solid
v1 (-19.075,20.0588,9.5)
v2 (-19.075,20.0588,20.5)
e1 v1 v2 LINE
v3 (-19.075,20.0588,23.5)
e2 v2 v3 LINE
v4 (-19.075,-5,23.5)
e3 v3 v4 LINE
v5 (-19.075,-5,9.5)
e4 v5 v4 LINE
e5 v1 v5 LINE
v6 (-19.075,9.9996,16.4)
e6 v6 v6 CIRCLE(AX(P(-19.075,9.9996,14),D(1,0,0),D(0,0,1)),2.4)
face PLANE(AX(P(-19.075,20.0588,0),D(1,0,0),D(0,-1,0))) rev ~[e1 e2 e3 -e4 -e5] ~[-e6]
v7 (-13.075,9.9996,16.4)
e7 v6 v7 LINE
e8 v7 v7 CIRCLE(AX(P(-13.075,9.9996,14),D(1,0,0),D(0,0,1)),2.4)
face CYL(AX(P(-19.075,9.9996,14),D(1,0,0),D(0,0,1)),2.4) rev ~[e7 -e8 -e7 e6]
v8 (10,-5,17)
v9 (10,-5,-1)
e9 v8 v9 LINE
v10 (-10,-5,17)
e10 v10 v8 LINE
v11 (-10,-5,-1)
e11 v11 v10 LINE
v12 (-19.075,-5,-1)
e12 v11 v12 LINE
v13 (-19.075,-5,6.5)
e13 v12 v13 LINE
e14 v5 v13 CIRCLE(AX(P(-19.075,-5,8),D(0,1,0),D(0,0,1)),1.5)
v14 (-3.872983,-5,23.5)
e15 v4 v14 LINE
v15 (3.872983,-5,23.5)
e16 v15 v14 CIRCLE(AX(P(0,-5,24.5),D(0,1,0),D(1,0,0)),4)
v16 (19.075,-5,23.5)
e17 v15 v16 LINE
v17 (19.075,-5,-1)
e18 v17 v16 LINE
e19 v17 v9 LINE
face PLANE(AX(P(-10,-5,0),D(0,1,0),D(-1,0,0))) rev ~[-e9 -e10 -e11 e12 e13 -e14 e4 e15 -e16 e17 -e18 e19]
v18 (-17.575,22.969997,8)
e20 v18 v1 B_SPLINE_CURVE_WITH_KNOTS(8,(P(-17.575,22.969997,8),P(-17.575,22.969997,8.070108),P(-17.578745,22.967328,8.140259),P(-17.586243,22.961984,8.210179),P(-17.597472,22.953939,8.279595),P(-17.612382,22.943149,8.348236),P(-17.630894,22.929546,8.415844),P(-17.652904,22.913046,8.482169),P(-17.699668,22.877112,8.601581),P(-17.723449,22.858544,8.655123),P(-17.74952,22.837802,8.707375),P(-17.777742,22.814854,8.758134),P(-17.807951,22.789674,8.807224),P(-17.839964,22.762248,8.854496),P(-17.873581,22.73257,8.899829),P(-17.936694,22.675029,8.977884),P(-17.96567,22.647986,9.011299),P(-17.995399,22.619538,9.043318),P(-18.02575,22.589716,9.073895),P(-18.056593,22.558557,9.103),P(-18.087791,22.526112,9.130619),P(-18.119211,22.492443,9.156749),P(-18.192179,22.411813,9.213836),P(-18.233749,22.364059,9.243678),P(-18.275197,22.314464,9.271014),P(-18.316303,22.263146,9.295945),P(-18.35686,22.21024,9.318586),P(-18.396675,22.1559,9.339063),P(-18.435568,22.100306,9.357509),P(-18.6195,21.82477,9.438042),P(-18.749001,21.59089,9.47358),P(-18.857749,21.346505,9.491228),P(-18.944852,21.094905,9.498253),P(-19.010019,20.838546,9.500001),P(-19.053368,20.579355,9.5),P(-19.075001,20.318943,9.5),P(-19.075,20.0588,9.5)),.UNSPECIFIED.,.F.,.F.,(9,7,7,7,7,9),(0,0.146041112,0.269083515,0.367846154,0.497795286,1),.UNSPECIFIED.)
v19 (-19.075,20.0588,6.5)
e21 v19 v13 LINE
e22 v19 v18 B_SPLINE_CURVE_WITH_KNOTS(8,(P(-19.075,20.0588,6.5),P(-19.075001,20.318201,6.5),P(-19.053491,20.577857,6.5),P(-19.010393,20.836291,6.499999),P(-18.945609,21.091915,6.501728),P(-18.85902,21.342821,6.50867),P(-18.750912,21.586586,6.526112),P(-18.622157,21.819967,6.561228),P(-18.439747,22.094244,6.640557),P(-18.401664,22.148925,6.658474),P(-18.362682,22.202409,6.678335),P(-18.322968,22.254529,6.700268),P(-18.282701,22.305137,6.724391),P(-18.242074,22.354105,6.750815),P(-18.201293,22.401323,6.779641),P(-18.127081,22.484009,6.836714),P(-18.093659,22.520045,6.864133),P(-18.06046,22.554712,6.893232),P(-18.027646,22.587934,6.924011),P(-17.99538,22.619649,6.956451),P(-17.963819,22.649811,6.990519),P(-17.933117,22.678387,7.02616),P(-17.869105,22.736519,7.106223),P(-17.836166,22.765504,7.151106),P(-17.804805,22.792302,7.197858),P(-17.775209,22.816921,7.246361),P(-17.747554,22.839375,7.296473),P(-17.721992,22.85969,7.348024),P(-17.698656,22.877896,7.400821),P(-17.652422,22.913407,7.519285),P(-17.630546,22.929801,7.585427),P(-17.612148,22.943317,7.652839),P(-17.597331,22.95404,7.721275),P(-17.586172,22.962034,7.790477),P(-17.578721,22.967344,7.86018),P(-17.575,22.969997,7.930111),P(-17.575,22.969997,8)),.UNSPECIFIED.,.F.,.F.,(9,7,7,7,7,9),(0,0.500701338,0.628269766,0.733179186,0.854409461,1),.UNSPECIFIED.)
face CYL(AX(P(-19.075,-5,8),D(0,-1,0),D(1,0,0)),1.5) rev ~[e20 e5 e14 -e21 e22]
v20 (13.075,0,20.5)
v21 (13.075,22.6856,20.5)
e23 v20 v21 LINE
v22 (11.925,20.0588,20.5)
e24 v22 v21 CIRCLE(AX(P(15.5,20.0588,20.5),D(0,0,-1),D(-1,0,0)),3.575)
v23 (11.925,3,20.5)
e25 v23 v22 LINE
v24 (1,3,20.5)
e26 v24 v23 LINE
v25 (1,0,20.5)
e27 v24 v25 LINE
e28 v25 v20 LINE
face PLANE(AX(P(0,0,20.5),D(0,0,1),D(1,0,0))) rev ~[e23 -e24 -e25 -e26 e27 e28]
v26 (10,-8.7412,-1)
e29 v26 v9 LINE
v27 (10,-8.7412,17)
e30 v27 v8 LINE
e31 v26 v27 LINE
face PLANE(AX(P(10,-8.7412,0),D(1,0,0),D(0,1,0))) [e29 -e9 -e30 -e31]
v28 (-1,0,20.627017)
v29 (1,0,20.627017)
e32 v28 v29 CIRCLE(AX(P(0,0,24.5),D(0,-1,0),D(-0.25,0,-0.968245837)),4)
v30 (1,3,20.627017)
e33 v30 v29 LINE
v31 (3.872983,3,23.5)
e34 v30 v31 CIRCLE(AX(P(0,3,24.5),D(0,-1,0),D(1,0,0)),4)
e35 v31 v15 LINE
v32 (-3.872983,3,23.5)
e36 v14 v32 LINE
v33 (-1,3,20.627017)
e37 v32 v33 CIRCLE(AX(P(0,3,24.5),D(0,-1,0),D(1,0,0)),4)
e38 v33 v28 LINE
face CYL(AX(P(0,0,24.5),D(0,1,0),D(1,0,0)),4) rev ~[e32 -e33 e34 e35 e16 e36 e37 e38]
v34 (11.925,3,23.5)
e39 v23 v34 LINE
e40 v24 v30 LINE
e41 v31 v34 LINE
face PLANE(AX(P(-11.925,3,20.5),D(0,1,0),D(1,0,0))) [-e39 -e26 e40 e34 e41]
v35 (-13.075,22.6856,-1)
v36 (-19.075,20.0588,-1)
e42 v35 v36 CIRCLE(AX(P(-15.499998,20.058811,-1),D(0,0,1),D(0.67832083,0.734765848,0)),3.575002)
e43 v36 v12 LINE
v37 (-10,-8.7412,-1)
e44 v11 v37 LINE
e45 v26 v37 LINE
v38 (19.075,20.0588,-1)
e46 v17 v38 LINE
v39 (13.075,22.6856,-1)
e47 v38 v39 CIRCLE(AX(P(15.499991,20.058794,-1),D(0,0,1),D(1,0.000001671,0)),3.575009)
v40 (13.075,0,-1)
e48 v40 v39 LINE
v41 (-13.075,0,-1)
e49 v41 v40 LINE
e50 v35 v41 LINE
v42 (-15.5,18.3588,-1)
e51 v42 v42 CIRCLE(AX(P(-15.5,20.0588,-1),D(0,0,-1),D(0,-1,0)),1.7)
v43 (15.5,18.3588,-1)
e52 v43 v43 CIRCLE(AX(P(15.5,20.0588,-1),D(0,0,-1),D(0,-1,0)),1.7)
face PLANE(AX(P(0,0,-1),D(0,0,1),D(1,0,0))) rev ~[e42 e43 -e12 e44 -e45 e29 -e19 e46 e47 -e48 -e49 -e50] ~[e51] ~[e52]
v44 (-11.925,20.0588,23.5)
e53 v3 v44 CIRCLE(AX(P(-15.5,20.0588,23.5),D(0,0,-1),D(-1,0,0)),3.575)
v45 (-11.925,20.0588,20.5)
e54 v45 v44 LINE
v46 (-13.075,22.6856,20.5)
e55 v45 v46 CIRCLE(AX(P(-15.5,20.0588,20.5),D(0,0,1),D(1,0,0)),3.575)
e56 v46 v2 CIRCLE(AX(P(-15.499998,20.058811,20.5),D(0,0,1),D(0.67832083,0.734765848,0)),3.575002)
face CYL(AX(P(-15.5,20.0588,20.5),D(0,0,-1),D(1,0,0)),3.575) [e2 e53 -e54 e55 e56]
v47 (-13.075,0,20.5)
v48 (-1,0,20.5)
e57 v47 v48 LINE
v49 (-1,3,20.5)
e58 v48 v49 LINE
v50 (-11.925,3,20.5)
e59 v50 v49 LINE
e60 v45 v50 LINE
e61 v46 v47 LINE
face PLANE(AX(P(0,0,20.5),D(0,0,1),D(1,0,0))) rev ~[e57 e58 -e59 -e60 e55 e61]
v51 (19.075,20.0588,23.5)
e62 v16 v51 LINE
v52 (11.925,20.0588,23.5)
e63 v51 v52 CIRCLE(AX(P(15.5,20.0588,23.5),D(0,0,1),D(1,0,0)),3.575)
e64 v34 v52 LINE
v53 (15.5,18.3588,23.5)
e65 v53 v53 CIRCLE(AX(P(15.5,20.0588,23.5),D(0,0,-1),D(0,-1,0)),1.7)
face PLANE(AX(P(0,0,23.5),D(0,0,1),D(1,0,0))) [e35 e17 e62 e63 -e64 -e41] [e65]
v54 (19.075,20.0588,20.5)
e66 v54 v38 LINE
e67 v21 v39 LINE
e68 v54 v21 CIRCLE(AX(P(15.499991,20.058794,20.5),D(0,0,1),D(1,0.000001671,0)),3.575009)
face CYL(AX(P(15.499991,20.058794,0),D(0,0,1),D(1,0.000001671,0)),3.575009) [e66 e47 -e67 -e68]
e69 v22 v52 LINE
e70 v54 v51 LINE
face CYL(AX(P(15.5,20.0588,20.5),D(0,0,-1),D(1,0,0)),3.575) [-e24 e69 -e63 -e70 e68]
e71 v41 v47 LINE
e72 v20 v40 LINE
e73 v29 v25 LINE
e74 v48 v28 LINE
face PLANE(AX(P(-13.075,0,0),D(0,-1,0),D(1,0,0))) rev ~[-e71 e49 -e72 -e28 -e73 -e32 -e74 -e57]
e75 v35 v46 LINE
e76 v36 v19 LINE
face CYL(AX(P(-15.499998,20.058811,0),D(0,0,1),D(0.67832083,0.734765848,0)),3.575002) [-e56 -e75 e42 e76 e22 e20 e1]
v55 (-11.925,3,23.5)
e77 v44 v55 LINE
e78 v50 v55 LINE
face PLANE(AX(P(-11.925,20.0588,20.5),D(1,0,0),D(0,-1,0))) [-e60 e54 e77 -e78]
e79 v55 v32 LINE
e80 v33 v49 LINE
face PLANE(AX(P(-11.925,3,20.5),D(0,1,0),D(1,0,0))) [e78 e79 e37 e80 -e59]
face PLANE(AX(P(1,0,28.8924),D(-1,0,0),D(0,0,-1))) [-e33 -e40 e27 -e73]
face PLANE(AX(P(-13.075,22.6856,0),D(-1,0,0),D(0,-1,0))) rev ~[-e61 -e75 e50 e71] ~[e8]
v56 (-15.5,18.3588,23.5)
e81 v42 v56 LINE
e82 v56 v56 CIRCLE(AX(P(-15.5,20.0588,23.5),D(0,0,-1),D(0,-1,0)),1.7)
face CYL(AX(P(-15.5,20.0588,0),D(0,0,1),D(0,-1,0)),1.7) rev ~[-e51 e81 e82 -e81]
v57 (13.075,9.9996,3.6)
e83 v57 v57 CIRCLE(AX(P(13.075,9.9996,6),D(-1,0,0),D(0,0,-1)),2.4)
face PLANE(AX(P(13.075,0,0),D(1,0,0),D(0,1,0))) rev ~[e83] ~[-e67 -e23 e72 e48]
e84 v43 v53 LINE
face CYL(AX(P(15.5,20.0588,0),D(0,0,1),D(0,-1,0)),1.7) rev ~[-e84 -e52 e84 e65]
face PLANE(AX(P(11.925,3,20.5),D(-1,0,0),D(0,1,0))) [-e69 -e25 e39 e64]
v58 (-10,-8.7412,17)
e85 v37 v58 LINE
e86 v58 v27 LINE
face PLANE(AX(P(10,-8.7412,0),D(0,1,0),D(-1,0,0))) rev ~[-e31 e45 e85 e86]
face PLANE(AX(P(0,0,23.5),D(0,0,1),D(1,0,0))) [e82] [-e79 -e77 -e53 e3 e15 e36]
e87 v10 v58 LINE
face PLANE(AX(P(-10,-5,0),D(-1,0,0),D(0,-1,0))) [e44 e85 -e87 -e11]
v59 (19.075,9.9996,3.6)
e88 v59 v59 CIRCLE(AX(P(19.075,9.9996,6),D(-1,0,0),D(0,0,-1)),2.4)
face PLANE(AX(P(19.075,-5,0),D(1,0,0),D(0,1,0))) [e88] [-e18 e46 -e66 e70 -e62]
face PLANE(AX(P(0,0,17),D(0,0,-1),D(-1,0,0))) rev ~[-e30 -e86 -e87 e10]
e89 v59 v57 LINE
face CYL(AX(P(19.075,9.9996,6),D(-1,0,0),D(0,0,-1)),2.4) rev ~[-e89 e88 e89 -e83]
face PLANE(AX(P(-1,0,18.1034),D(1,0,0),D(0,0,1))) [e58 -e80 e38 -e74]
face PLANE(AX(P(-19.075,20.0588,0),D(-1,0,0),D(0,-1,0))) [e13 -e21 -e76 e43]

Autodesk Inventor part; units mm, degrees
ref_plane "YZ Plane" through (0, 0, 0) normal (1, 0, 0) x (0, 1, 0)
ref_plane "XZ Plane" through (0, 0, 0) normal (0, 1, 0) x (-1, 0, 0)
ref_plane "XY Plane" through (0, 0, 0) normal (0, 0, 1) x (1, 0, 0)
sketch "Sketch1" plane through (0, 0, 0) normal (0, 0, 1) x (1, 0, 0)
  line L0 (-13.075, 0) -> (13.075, 0)
  line L1 (13.075, 0) -> (13.075, 22.6856)
  line L2 (-13.075, 22.6856) -> (-13.075, 0)
  line L3 (-19.075, -5) -> (11.925, -5)
  line L4 (19.075, -5) -> (19.075, 20.0588)
  line L5 (-19.075, 20.0588) -> (-19.075, -5)
  circle A0 centre (-15.5, 20.0588) radius 1.5
  circle A1 centre (15.5, 20.0588) radius 1.5
  arc A2 (19.075, 20.0588) -> (13.075, 22.6856) centre (15.5, 20.0588) ccw
  arc A3 (-13.075, 22.6856) -> (-19.075, 20.0588) centre (-15.5, 20.0588) ccw
  line L6 (11.925, -5) -> (19.075, -5)
  point P0 (0, 0)
  dimension "d8" = 5
  dimension "d10" = 6
  dimension "d12" = 31
  dimension "d14" = 3
  dimension "d15" = 3
  dimension "d17" = 26.15
  dimension "d18" = 13.075
  dimension "d19" = 15.5
extrude "Extrusion1" add sketch "Sketch1" along normal blind 20.5 contours L0 L1 A2 L4 L6 L3 L5 A3 L2 | A0 | A1
sketch "Sketch4" plane through (0, 0, 20.5) normal (0, 0, 1) x (1, 0, 0)
  arc A0 (-11.925, 20.0588) -> (-19.075, 20.0588) centre (-15.5, 20.0588) ccw
  arc A1 (19.075, 20.0588) -> (11.925, 20.0588) centre (15.5, 20.0588) ccw
  arc A2 (19.075, 20.0588) -> (13.075, 22.6856) centre (15.5, 20.0588) ccw projected
  arc A3 (-13.075, 22.6856) -> (-19.075, 20.0588) centre (-15.5, 20.0588) ccw projected
  line L0 (-19.075, -5) -> (19.075, -5) projected
  line L1 (19.075, -5) -> (19.075, 20.0588) projected
  arc A4 (19.075, 20.0588) -> (13.075, 22.6856) centre (15.5, 20.0588) ccw projected
  line L2 (13.075, 22.6856) -> (13.075, 0) projected
  line L3 (13.075, 0) -> (-13.075, 0) projected
  line L4 (-13.075, 0) -> (-13.075, 22.6856) projected
  arc A5 (-13.075, 22.6856) -> (-19.075, 20.0588) centre (-15.5, 20.0588) ccw projected
  line L5 (-19.075, 20.0588) -> (-19.075, -5) projected
  line L6 (-11.925, 20.0588) -> (-11.925, 3)
  line L7 (-11.925, 3) -> (11.925, 3)
  line L8 (11.925, 3) -> (11.925, 20.0588)
  point P0 (0, 0)
  point P1 (13.075, 22.6856)
  point P2 (13.075, 22.6856)
  dimension "d37" = 3
extrude "Extrusion3" add sketch "Sketch4" along normal blind 3
sketch "Sketch5" plane through (0, 0, 23.5) normal (0, 0, 1) x (1, 0, 0)
  arc A0 (-13.075, 22.6856) -> (-19.075, 20.0588) centre (-15.5, 20.0588) ccw projected
  arc A1 (19.075, 20.0588) -> (13.075, 22.6856) centre (15.5, 20.0588) ccw projected
  point P0 (0, 0)
hole "Hole2" at (-15.5, 20.0588, 23.5) at (15.5, 20.0588, 23.5) direction (0, 0, -1) diameter 3.4 end through all clearance for "Socket Head Cap Screw" size "M3" standard "Ansi Metric M Profile"
sketch "Sketch8" plane through (-13.075, 0, 0) normal (0, 1, 0) x (1, 0, 0)
  circle A0 centre (13.075, -24.5) radius 4
  line L0 (25, -23.5) -> (1.15, -23.5) projected
  point P0 (13.075, 0)
  dimension "d62" = 8
  dimension "d63" = 1
extrude "Extrusion5" cut sketch "Sketch8" against normal through all both and the other way through all
sketch "Sketch9" plane through (-13.075, 0, 0) normal (0, 1, 0) x (1, 0, 0)
  line L0 (12.075, -28.8924) -> (14.075, -28.8924)
  line L1 (14.075, -28.8924) -> (14.075, -18.1034)
  line L2 (14.075, -18.1034) -> (12.075, -18.1034)
  line L3 (12.075, -18.1034) -> (12.075, -28.8924)
  line L4 (12.075, -28.8924) -> (14.075, -18.1034) construction
  line L5 (14.075, -28.8924) -> (12.075, -18.1034) construction
  point P0 (13.075, 0)
  point P1 (13.075, -23.4979)
  dimension "d66" = 2
extrude "Extrusion6" cut sketch "Sketch9" along normal blind 10
sketch "Sketch10" plane through (19.075, -5, 0) normal (1, 0, 0) x (0, 0, -1)
  circle A0 centre (-6, 14.9996) radius 2
  line L0 (0, 0) -> (-23.5, 0) projected
  line L1 (0, 0) -> (0, 25.0588) projected
  line L2 (0, 27.6856) -> (-20.5, 27.6856) projected
  point P0 (0, 5)
  dimension "d70" = 6
  dimension "d71" = 4
  dimension "d88" = 12.686
hole "Hole4" at (19.075, 9.9996, 6) direction (-1, 0, 0) diameter 4.8 depth 6 clearance for "Socket Head Cap Screw" size "M4" standard "Ansi Metric M Profile"
sketch "Sketch11" plane through (-19.075, -5, 0) normal (-1, 0, 0) x (0, 0, 1)
  circle A0 centre (14, 14.9996) radius 3.2686
  line L0 (0, 0) -> (23.5, 0) projected
  circle A1 centre (6, 14.9996) radius 2.4 projected
  line L1 (0, 27.6856) -> (20.5, 27.6856) projected
  point P0 (0, 5)
  point P1 (10.9595, 8.3093)
  dimension "d80" = 8
  dimension "d89" = 12.686
hole "Hole5" at (-19.075, 9.9996, 14) direction (1, 0, 0) diameter 4.8 depth 6 clearance for "Socket Head Cap Screw" size "M4" standard "Ansi Metric M Profile"
sketch "Sketch12" plane through (-19.075, -5, 0) normal (0, -1, 0) x (1, 0, 0)
  line L0 (38.15, 0) -> (38.15, 23.5) projected
  circle A0 centre (0, 8) radius 1.5
  line L1 (0, 0) -> (0, 23.5) projected
  line L2 (0, 0) -> (38.15, 0) projected
  point P0 (19.075, 0)
  dimension "d93" = 3
  dimension "d94" = 8
extrude "Extrusion7" cut sketch "Sketch12" against normal through all
sketch "Sketch13" plane through (0, 0, 0) normal (0, 0, -1) x (-1, 0, 0)
  circle A0 centre (15.5, 20.0588) radius 1.7 projected
  circle A1 centre (-15.5, 20.0588) radius 1.7 projected
  line L0 (19.075, 20.0588) -> (19.075, -5) projected
  arc A2 (19.075, 20.0588) -> (13.075, 22.6856) centre (15.5, 20.0588) ccw projected
  line L1 (13.075, 0) -> (13.075, 22.6856) projected
  line L2 (-13.075, 0) -> (13.075, 0) projected
  line L3 (-13.075, 22.6856) -> (-13.075, 0) projected
  arc A3 (-13.075, 22.6856) -> (-19.075, 20.0588) centre (-15.5, 20.0588) ccw projected
  line L4 (-19.075, -5) -> (-19.075, 20.0588) projected
  line L5 (19.075, -5) -> (-19.075, -5) projected
  line L6 (-4.8329, -8.7412) -> (5.1671, -8.7412) projected
  line L7 (-10, -1.2588) -> (10, -1.2588)
  line L8 (10, -1.2588) -> (10, -8.7412)
  line L9 (10, -8.7412) -> (-10, -8.7412)
  line L10 (-10, -8.7412) -> (-10, -1.2588)
  line L11 (19.075, -5) -> (-19.075, -5) projected
  line L12 (-10, -1.2588) -> (10, -8.7412) construction
  line L13 (10, -1.2588) -> (-10, -8.7412) construction
  point P0 (0, 0)
  point P1 (0, -5)
  point P2 (-10, -5)
  point P3 (10, -5)
  dimension "d95" = 20
extrude "Extrusion8" add sketch "Sketch13" against normal blind 17 contours L8 L9 L6 L10 L5
move faces "Move1" translate (0, 0, -1) faces at (-17.075, 5.0196, 0)
properties part number "SolenoidBracket"
